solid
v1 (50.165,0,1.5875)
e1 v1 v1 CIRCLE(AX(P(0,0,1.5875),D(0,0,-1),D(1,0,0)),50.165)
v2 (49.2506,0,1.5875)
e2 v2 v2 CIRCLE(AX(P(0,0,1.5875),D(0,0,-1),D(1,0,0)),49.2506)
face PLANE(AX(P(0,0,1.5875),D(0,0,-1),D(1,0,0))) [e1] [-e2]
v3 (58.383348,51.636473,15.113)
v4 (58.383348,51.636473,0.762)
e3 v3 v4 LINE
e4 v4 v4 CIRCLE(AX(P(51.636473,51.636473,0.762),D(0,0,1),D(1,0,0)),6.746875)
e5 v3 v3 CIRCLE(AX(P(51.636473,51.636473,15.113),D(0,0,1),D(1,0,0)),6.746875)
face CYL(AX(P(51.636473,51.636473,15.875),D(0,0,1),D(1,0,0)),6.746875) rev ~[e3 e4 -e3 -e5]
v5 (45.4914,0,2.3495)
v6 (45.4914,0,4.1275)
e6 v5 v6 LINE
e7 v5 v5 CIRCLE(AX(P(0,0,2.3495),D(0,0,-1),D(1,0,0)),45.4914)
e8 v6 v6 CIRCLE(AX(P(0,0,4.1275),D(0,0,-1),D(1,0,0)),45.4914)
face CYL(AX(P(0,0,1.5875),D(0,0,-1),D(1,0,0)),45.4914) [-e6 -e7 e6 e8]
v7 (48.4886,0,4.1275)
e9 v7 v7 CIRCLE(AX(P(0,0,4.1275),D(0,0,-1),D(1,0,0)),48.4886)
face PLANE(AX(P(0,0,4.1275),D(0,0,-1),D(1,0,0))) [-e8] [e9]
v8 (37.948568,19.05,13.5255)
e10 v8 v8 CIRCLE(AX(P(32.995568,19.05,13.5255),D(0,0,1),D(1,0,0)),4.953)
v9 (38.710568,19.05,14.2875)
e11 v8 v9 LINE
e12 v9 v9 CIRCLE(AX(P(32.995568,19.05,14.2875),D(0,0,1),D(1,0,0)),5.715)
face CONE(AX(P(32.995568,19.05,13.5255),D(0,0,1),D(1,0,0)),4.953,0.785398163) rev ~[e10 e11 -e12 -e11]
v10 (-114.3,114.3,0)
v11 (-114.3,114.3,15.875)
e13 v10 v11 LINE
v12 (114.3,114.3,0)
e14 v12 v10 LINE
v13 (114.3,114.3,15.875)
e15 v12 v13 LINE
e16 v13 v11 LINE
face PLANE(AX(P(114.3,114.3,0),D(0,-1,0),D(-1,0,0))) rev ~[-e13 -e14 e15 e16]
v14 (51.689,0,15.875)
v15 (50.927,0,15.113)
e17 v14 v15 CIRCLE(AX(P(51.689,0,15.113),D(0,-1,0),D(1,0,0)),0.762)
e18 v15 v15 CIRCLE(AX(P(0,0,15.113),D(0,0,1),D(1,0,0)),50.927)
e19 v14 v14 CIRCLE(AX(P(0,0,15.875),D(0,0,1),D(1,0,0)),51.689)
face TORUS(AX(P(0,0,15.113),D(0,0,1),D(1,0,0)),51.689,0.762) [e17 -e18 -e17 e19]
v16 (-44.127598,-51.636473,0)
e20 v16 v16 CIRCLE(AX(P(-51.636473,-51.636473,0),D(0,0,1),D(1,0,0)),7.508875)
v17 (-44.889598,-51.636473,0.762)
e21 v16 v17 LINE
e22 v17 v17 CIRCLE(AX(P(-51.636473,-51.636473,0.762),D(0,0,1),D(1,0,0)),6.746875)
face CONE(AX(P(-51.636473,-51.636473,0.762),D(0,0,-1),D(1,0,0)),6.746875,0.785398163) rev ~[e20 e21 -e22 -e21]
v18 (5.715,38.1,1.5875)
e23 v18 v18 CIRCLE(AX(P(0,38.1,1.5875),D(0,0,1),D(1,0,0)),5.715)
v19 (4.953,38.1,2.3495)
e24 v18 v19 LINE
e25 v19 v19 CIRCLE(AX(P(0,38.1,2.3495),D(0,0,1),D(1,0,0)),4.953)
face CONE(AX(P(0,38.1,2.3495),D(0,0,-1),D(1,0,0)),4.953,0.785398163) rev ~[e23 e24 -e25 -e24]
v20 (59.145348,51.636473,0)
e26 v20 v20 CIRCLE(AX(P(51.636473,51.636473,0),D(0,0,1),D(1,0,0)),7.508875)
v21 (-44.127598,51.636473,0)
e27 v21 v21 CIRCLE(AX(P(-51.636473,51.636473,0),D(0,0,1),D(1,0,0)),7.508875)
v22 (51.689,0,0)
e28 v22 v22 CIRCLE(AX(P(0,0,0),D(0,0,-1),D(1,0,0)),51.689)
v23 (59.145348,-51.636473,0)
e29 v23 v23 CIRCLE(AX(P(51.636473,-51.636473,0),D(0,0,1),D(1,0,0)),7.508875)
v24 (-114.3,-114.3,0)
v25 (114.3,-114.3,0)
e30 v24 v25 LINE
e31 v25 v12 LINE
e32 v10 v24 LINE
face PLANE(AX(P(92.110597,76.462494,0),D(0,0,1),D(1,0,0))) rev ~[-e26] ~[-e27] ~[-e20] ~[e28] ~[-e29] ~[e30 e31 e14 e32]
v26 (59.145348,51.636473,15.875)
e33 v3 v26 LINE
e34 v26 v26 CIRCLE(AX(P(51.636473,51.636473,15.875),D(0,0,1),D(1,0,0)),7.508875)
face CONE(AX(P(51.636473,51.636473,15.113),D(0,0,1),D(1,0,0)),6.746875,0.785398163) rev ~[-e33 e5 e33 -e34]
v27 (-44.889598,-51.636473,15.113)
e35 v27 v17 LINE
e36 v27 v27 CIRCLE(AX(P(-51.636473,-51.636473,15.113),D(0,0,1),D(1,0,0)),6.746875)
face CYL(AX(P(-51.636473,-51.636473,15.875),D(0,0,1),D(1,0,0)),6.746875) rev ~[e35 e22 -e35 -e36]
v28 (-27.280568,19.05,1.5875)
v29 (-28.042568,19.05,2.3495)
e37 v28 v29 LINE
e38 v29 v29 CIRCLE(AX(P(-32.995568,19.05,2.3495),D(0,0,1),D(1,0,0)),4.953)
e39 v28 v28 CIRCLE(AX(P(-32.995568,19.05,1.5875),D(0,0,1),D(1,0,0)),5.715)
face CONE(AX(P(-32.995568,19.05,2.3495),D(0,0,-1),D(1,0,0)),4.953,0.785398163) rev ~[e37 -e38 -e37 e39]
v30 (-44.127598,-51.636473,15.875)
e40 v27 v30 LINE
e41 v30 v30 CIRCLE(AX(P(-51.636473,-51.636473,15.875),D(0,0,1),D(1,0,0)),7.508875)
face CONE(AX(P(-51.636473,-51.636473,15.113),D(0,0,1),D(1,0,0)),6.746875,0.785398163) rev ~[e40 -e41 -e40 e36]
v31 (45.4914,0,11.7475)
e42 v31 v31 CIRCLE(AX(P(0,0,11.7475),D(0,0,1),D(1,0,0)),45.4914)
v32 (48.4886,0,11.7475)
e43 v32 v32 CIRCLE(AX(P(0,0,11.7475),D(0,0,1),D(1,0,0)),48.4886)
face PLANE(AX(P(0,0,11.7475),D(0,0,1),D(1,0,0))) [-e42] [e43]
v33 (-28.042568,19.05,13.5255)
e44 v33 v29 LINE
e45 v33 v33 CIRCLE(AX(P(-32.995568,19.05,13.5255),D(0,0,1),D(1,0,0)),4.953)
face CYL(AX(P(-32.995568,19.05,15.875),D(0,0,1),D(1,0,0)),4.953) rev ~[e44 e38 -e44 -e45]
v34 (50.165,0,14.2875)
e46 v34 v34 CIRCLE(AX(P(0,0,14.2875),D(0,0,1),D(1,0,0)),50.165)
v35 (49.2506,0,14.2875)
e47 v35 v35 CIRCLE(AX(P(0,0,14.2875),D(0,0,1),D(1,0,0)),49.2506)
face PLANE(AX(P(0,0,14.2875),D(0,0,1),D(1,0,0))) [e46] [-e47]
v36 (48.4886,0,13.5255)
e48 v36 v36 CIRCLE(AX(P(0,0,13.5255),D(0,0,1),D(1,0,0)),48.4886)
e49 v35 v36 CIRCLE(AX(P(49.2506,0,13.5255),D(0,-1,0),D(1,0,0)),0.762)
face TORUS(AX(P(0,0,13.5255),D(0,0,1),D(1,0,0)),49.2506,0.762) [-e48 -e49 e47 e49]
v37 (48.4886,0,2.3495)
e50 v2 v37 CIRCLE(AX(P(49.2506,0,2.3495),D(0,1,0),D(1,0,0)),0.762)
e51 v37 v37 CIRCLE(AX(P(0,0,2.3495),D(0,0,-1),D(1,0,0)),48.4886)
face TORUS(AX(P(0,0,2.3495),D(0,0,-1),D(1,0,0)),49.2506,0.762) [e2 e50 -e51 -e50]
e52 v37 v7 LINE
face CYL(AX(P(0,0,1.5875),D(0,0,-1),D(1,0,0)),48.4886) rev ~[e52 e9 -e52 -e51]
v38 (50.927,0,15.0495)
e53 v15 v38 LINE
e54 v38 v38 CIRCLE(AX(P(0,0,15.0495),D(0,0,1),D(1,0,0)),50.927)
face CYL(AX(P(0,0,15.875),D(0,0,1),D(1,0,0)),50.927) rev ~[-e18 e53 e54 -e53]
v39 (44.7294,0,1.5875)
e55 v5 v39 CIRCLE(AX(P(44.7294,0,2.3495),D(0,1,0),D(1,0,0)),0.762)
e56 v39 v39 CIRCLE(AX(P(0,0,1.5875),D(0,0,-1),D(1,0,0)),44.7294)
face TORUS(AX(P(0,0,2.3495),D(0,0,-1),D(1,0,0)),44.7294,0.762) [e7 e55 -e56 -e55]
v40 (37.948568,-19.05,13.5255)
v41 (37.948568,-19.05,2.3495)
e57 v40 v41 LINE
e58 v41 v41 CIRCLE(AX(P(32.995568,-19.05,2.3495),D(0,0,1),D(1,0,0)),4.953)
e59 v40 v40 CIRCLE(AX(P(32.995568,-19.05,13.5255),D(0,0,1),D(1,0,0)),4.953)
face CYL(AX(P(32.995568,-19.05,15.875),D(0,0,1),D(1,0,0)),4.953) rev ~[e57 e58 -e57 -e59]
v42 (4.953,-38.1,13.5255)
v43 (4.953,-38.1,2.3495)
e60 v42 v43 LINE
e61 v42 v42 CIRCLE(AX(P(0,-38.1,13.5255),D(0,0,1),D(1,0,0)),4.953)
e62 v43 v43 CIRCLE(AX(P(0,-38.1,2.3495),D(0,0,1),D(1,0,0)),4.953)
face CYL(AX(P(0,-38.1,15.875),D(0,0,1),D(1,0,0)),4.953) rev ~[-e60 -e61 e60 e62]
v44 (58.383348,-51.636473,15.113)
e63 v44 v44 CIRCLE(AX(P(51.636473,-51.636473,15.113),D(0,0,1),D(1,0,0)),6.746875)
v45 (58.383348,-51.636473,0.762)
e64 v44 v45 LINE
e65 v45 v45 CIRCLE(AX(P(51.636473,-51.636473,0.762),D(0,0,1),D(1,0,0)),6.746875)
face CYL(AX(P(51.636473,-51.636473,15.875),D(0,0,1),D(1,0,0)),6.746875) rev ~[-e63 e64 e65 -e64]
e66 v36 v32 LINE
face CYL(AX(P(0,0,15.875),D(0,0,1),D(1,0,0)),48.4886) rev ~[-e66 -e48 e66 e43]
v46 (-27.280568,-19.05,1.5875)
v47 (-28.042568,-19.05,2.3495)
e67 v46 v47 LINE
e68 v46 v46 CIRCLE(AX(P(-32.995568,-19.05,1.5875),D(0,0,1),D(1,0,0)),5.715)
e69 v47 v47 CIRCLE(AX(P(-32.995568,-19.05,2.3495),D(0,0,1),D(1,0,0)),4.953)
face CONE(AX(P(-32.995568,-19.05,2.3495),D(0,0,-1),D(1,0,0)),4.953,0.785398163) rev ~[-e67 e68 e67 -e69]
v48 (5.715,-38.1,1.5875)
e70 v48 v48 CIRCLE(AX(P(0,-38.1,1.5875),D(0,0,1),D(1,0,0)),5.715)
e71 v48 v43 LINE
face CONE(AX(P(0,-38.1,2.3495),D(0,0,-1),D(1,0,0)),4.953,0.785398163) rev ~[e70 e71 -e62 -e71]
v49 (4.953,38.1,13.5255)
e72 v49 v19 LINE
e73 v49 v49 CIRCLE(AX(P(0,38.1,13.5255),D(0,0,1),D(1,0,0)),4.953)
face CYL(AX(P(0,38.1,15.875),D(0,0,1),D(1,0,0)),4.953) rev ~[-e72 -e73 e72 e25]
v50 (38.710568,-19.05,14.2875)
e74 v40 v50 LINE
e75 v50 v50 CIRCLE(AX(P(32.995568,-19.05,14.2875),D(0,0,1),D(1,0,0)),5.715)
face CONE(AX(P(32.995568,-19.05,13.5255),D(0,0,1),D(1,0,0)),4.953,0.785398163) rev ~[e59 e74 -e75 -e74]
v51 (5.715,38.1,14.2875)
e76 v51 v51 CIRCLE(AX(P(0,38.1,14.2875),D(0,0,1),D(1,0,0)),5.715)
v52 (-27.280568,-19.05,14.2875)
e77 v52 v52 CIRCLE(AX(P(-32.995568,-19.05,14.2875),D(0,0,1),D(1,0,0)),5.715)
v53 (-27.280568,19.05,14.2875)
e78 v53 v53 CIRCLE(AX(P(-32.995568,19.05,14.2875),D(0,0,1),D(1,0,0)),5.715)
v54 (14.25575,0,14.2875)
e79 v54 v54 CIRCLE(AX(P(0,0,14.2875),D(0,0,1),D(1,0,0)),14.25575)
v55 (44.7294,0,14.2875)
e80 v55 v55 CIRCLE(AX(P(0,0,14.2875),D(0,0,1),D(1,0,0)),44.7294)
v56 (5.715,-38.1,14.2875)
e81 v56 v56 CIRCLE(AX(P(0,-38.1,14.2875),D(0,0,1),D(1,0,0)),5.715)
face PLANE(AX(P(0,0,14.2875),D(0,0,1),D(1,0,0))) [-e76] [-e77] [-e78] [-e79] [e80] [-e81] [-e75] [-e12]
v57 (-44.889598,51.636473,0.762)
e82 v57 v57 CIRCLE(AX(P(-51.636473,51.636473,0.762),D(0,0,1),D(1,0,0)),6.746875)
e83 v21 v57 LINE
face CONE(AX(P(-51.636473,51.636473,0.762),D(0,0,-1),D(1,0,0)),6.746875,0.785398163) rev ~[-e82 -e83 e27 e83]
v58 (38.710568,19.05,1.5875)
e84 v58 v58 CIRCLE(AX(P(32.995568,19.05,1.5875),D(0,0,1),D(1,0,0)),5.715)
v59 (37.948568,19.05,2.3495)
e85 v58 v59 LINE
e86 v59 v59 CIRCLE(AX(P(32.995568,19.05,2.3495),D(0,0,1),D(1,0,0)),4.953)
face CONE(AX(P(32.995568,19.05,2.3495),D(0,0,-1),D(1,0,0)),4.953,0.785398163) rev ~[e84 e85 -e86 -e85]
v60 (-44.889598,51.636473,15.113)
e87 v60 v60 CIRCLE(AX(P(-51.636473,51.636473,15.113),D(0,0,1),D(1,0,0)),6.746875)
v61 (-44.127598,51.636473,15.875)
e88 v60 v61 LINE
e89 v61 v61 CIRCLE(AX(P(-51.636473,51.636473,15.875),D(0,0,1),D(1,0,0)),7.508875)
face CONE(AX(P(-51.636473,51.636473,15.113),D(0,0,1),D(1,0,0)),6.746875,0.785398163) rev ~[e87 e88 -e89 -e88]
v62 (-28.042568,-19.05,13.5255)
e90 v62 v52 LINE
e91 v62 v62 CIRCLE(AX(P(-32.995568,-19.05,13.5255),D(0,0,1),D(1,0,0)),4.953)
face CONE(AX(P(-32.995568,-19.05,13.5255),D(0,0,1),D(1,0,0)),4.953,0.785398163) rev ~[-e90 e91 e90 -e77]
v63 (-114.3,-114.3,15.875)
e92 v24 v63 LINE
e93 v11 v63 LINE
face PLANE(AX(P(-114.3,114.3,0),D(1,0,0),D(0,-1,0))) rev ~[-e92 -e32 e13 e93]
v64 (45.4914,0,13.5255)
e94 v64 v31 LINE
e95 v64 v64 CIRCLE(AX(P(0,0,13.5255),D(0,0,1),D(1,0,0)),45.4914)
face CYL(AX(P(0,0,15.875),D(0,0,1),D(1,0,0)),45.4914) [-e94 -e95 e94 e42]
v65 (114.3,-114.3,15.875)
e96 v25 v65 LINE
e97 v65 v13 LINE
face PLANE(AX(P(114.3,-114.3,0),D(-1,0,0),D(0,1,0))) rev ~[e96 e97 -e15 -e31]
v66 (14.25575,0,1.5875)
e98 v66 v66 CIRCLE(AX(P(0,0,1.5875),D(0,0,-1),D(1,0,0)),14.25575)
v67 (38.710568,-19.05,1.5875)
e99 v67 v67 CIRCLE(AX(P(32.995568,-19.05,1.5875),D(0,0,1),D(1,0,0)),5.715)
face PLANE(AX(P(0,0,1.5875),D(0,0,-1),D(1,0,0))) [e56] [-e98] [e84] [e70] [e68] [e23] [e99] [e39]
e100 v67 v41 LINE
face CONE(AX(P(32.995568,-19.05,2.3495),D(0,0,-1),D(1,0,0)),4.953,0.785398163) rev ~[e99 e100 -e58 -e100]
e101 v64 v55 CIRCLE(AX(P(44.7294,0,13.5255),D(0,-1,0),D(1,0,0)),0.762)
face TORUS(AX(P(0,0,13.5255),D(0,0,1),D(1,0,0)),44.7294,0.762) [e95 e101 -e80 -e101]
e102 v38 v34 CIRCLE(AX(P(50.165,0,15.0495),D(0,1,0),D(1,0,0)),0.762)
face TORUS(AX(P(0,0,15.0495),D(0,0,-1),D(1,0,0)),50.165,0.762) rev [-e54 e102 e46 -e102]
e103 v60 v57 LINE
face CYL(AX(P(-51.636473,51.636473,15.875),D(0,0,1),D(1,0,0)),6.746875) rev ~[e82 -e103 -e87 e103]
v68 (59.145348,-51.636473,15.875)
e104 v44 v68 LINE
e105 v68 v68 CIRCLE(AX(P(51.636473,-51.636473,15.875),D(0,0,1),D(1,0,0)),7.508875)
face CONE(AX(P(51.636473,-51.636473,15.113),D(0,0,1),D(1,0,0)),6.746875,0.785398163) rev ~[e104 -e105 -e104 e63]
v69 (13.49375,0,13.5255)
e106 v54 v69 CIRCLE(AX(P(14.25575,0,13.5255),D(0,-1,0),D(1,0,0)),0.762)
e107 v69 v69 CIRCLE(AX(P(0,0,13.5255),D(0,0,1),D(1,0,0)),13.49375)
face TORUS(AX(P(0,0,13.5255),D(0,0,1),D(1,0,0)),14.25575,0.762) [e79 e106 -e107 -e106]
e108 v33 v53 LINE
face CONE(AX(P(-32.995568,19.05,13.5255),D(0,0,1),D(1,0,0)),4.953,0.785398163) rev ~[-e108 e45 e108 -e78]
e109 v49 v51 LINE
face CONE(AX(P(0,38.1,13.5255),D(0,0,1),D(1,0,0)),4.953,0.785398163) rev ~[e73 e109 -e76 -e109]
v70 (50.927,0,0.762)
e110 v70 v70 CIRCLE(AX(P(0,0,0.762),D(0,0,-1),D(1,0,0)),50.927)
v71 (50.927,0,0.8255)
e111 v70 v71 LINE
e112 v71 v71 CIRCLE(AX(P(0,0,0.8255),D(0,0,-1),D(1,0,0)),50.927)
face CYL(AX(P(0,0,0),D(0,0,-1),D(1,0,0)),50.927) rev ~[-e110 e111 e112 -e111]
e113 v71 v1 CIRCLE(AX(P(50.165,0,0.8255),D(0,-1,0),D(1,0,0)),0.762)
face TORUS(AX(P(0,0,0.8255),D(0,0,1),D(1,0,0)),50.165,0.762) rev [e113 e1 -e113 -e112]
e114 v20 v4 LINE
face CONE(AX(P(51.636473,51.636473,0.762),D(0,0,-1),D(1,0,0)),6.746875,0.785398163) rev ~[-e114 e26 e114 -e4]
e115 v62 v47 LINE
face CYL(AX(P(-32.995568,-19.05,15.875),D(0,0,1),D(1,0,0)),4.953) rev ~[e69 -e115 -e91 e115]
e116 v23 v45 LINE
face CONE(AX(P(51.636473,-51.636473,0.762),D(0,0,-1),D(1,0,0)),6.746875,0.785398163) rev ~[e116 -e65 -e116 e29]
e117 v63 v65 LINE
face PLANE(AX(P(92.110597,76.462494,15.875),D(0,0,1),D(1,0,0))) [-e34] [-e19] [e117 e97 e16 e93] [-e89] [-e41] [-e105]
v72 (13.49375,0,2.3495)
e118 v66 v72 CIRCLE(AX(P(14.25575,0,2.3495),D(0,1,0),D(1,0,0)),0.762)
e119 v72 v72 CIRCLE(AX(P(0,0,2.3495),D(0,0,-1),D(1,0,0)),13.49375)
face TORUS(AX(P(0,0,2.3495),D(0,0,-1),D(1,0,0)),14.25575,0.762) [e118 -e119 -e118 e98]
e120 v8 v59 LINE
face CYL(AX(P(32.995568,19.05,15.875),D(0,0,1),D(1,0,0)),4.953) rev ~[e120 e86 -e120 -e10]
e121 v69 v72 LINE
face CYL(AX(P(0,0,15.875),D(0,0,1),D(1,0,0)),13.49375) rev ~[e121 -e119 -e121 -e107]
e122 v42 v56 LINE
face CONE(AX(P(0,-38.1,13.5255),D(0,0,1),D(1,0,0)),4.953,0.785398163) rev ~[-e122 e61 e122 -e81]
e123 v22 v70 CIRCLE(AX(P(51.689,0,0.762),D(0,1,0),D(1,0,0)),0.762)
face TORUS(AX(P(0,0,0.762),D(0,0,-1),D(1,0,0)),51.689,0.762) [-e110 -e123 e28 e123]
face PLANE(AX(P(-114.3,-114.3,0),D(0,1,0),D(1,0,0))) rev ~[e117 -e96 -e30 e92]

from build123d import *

# Parameters (mm, degrees)
F1_DEPTH  = 15.875
F2_R      = 6.746875
F3_DEPTH  = 25.4
F4_R      = 50.927
F4_R_2    = 13.49375
F5_DEPTH  = 1.5875
F6_DEPTH  = 25.4
F7_R      = 50.927
F7_R_2    = 13.49375
F8_DEPTH  = 1.5875
F9_R      = 4.953
F10_DEPTH = 25.4
F9_R_2    = 48.4886
F9_R_3    = 45.4914
F11_DEPTH = 4.1275
F12_R     = 48.4886
F12_R_2   = 45.4914
F13_DEPTH = 2.54
F14_R     = 0.762
F15_SIZE  = 0.762


# Not quite as in the source:
# - a feature names something its author has since deleted; it is built from what else it names


with BuildPart() as f1:
    # F0 (on Top) → F1 (new body)
    with BuildSketch(Plane.XY):
        with BuildLine():
            ThreePointArc((58.9450638246, 74.8200638246), (77.4288162629, 55.4737858103), (89.8025612107, 31.75))
            Line((89.8025612107, 31.75), (114.3, 74.1808086384))
            Line((114.3, 74.1808086384), (114.3, 114.3))
            Line((114.3, 114.3), (98.425, 114.3))
            Line((98.425, 114.3), (58.9450638246, 74.8200638246))
        make_face()
        with BuildLine():
            ThreePointArc((-89.8025612107, 31.75), (-77.4288162629, 55.4737858103), (-58.9450638246, 74.8200638246))
            Line((-58.9450638246, 74.8200638246), (-98.425, 114.3))
            Line((-98.425, 114.3), (-114.3, 114.3))
            Line((-114.3, 114.3), (-114.3, 74.1808086384))
            Line((-114.3, 74.1808086384), (-89.8025612107, 31.75))
        make_face()
        with BuildLine():
            Line((-98.425, -114.3), (-58.9450638246, -74.8200638246))
            ThreePointArc((-58.9450638246, -74.8200638246), (-77.4288162629, -55.4737858103), (-89.8025612107, -31.75))
            Line((-89.8025612107, -31.75), (-114.3, -74.1808086384))
            Line((-114.3, -74.1808086384), (-114.3, -114.3))
            Line((-114.3, -114.3), (-98.425, -114.3))
        make_face()
        with BuildLine():
            Line((114.3, -74.1808086384), (89.8025612107, -31.75))
            ThreePointArc((89.8025612107, -31.75), (77.4288162629, -55.4737858103), (58.9450638246, -74.8200638246))
            Line((58.9450638246, -74.8200638246), (98.425, -114.3))
            Line((98.425, -114.3), (114.3, -114.3))
            Line((114.3, -114.3), (114.3, -74.1808086384))
        make_face()
        with BuildLine():
            ThreePointArc((89.8025612107, -31.75), (93.878262807, -16.1069634736), (95.25, 0))
            ThreePointArc((95.25, 0), (93.878262807, 16.1069634736), (89.8025612107, 31.75))
            ThreePointArc((89.8025612107, 31.75), (77.4288162629, 55.4737858103), (58.9450638246, 74.8200638246))
            ThreePointArc((58.9450638246, 74.8200638246), (0, 95.25), (-58.9450638246, 74.8200638246))
            ThreePointArc((-58.9450638246, 74.8200638246), (-77.4288162629, 55.4737858103), (-89.8025612107, 31.75))
            ThreePointArc((-89.8025612107, 31.75), (-95.25, 0), (-89.8025612107, -31.75))
            ThreePointArc((-89.8025612107, -31.75), (-77.4288162629, -55.4737858103), (-58.9450638246, -74.8200638246))
            ThreePointArc((-58.9450638246, -74.8200638246), (0, -95.25), (58.9450638246, -74.8200638246))
            ThreePointArc((58.9450638246, -74.8200638246), (77.4288162629, -55.4737858103), (89.8025612107, -31.75))
        make_face()
        with BuildLine():
            ThreePointArc((-58.9450638246, 74.8200638246), (0, 95.25), (58.9450638246, 74.8200638246))
            Line((58.9450638246, 74.8200638246), (98.425, 114.3))
            Line((98.425, 114.3), (-98.425, 114.3))
            Line((-98.425, 114.3), (-58.9450638246, 74.8200638246))
        make_face()
        with BuildLine():
            ThreePointArc((89.8025612107, 31.75), (93.878262807, 16.1069634736), (95.25, 0))
            ThreePointArc((95.25, 0), (93.878262807, -16.1069634736), (89.8025612107, -31.75))
            Line((89.8025612107, -31.75), (114.3, -74.1808086384))
            Line((114.3, -74.1808086384), (114.3, 74.1808086384))
            Line((114.3, 74.1808086384), (89.8025612107, 31.75))
        make_face()
        with BuildLine():
            Line((98.425, -114.3), (58.9450638246, -74.8200638246))
            ThreePointArc((58.9450638246, -74.8200638246), (0, -95.25), (-58.9450638246, -74.8200638246))
            Line((-58.9450638246, -74.8200638246), (-98.425, -114.3))
            Line((-98.425, -114.3), (98.425, -114.3))
        make_face()
        with BuildLine():
            ThreePointArc((-89.8025612107, -31.75), (-95.25, 0), (-89.8025612107, 31.75))
            Line((-89.8025612107, 31.75), (-114.3, 74.1808086384))
            Line((-114.3, 74.1808086384), (-114.3, -74.1808086384))
            Line((-114.3, -74.1808086384), (-89.8025612107, -31.75))
        make_face()
    extrude(amount=F1_DEPTH)

    # F2 (on face) → F3 (cut)
    with BuildSketch(Plane.XY.offset(15.875)):
        with Locations((51.6364726961, 51.6364726961)):
            Circle(F2_R)
        with Locations((-51.6364726961, 51.6364726961)):
            Circle(F2_R)
        with Locations((-51.6364726961, -51.6364726961)):
            Circle(F2_R)
        with Locations((51.6364726961, -51.6364726961)):
            Circle(F2_R)
    extrude(amount=-F3_DEPTH, mode=Mode.SUBTRACT)

    # F4 (on face) → F5 (cut)
    with BuildSketch(Plane.XY.offset(15.875)):
        Circle(F4_R)
        Circle(F4_R_2, mode=Mode.SUBTRACT)
    extrude(amount=-F5_DEPTH, mode=Mode.SUBTRACT)

    # F4 (on face) → F6 (cut)
    with BuildSketch(Plane.XY.offset(15.875)):
        Circle(F4_R_2)
    extrude(amount=-F6_DEPTH, mode=Mode.SUBTRACT)

    # F7 (on face) → F8 (cut)
    with BuildSketch(Plane(origin=(0, 0, 0), x_dir=(1, 0, 0), z_dir=(0, 0, -1))):
        Circle(F7_R)
        Circle(F7_R_2, mode=Mode.SUBTRACT)
    extrude(amount=-F8_DEPTH, mode=Mode.SUBTRACT)

    # F9 (on face) → F10 (cut)
    with BuildSketch(Plane.XY.offset(15.875)):
        with Locations((0, 38.1)):
            Circle(F9_R)
        with Locations((32.9955678842, 19.05)):
            Circle(F9_R)
        with Locations((-32.9955678842, 19.05)):
            Circle(F9_R)
        with Locations((-32.9955678842, -19.05)):
            Circle(F9_R)
        with Locations((0, -38.1)):
            Circle(F9_R)
        with Locations((32.9955678842, -19.05)):
            Circle(F9_R)
    extrude(amount=-F10_DEPTH, mode=Mode.SUBTRACT)

    # F9 (on face) → F11 (cut)
    with BuildSketch(Plane.XY.offset(15.875)):
        Circle(F9_R_2)
        Circle(F9_R_3, mode=Mode.SUBTRACT)
    extrude(amount=-F11_DEPTH, mode=Mode.SUBTRACT)

    # F12 (on face) → F13 (cut)
    with BuildSketch(Plane(origin=(0, 0, 1.5875), x_dir=(1, 0, 0), z_dir=(0, 0, -1))):
        Circle(F12_R)
        Circle(F12_R_2, mode=Mode.SUBTRACT)
    extrude(amount=-F13_DEPTH, mode=Mode.SUBTRACT)

    # F14
    f14_edges = [f1.edges().sort_by_distance(p)[0] for p in [
        (-50.927, 0, 0),
        (-50.927, 0, 1.5875),
        (-48.4886, 0, 1.5875),
        (-45.4914, 0, 1.5875),
        (-13.49375, 0, 1.5875),
        (-13.49375, 0, 14.2875),
        (-48.4886, 0, 14.2875),
        (-50.927, 0, 14.2875),
        (-50.927, 0, 15.875),
        (-45.4914, 0, 14.2875),
    ]]
    fillet(f14_edges, radius=F14_R)

    # F15
    f15_edges = [f1.edges().sort_by_distance(p)[0] for p in [
        (44.889598, 51.636473, 15.875),
        (44.889598, 51.636473, 0),
        (44.889598, -51.636473, 15.875),
        (44.889598, -51.636473, 0),
        (-58.383348, 51.636473, 0),
        (-58.383348, 51.636473, 15.875),
        (-58.383348, -51.636473, 0),
        (-58.383348, -51.636473, 15.875),
        (-4.953, 38.1, 1.5875),
        (-4.953, 38.1, 14.2875),
        (28.042568, 19.05, 1.5875),
        (28.042568, 19.05, 14.2875),
        (28.042568, -19.05, 1.5875),
        (28.042568, -19.05, 14.2875),
        (-4.953, -38.1, 1.5875),
        (-4.953, -38.1, 14.2875),
        (-37.948568, -19.05, 1.5875),
        (-37.948568, -19.05, 14.2875),
        (-37.948568, 19.05, 14.2875),
        (-37.948568, 19.05, 1.5875),
    ]]
    chamfer(f15_edges, length=F15_SIZE)


solid = f1.part
